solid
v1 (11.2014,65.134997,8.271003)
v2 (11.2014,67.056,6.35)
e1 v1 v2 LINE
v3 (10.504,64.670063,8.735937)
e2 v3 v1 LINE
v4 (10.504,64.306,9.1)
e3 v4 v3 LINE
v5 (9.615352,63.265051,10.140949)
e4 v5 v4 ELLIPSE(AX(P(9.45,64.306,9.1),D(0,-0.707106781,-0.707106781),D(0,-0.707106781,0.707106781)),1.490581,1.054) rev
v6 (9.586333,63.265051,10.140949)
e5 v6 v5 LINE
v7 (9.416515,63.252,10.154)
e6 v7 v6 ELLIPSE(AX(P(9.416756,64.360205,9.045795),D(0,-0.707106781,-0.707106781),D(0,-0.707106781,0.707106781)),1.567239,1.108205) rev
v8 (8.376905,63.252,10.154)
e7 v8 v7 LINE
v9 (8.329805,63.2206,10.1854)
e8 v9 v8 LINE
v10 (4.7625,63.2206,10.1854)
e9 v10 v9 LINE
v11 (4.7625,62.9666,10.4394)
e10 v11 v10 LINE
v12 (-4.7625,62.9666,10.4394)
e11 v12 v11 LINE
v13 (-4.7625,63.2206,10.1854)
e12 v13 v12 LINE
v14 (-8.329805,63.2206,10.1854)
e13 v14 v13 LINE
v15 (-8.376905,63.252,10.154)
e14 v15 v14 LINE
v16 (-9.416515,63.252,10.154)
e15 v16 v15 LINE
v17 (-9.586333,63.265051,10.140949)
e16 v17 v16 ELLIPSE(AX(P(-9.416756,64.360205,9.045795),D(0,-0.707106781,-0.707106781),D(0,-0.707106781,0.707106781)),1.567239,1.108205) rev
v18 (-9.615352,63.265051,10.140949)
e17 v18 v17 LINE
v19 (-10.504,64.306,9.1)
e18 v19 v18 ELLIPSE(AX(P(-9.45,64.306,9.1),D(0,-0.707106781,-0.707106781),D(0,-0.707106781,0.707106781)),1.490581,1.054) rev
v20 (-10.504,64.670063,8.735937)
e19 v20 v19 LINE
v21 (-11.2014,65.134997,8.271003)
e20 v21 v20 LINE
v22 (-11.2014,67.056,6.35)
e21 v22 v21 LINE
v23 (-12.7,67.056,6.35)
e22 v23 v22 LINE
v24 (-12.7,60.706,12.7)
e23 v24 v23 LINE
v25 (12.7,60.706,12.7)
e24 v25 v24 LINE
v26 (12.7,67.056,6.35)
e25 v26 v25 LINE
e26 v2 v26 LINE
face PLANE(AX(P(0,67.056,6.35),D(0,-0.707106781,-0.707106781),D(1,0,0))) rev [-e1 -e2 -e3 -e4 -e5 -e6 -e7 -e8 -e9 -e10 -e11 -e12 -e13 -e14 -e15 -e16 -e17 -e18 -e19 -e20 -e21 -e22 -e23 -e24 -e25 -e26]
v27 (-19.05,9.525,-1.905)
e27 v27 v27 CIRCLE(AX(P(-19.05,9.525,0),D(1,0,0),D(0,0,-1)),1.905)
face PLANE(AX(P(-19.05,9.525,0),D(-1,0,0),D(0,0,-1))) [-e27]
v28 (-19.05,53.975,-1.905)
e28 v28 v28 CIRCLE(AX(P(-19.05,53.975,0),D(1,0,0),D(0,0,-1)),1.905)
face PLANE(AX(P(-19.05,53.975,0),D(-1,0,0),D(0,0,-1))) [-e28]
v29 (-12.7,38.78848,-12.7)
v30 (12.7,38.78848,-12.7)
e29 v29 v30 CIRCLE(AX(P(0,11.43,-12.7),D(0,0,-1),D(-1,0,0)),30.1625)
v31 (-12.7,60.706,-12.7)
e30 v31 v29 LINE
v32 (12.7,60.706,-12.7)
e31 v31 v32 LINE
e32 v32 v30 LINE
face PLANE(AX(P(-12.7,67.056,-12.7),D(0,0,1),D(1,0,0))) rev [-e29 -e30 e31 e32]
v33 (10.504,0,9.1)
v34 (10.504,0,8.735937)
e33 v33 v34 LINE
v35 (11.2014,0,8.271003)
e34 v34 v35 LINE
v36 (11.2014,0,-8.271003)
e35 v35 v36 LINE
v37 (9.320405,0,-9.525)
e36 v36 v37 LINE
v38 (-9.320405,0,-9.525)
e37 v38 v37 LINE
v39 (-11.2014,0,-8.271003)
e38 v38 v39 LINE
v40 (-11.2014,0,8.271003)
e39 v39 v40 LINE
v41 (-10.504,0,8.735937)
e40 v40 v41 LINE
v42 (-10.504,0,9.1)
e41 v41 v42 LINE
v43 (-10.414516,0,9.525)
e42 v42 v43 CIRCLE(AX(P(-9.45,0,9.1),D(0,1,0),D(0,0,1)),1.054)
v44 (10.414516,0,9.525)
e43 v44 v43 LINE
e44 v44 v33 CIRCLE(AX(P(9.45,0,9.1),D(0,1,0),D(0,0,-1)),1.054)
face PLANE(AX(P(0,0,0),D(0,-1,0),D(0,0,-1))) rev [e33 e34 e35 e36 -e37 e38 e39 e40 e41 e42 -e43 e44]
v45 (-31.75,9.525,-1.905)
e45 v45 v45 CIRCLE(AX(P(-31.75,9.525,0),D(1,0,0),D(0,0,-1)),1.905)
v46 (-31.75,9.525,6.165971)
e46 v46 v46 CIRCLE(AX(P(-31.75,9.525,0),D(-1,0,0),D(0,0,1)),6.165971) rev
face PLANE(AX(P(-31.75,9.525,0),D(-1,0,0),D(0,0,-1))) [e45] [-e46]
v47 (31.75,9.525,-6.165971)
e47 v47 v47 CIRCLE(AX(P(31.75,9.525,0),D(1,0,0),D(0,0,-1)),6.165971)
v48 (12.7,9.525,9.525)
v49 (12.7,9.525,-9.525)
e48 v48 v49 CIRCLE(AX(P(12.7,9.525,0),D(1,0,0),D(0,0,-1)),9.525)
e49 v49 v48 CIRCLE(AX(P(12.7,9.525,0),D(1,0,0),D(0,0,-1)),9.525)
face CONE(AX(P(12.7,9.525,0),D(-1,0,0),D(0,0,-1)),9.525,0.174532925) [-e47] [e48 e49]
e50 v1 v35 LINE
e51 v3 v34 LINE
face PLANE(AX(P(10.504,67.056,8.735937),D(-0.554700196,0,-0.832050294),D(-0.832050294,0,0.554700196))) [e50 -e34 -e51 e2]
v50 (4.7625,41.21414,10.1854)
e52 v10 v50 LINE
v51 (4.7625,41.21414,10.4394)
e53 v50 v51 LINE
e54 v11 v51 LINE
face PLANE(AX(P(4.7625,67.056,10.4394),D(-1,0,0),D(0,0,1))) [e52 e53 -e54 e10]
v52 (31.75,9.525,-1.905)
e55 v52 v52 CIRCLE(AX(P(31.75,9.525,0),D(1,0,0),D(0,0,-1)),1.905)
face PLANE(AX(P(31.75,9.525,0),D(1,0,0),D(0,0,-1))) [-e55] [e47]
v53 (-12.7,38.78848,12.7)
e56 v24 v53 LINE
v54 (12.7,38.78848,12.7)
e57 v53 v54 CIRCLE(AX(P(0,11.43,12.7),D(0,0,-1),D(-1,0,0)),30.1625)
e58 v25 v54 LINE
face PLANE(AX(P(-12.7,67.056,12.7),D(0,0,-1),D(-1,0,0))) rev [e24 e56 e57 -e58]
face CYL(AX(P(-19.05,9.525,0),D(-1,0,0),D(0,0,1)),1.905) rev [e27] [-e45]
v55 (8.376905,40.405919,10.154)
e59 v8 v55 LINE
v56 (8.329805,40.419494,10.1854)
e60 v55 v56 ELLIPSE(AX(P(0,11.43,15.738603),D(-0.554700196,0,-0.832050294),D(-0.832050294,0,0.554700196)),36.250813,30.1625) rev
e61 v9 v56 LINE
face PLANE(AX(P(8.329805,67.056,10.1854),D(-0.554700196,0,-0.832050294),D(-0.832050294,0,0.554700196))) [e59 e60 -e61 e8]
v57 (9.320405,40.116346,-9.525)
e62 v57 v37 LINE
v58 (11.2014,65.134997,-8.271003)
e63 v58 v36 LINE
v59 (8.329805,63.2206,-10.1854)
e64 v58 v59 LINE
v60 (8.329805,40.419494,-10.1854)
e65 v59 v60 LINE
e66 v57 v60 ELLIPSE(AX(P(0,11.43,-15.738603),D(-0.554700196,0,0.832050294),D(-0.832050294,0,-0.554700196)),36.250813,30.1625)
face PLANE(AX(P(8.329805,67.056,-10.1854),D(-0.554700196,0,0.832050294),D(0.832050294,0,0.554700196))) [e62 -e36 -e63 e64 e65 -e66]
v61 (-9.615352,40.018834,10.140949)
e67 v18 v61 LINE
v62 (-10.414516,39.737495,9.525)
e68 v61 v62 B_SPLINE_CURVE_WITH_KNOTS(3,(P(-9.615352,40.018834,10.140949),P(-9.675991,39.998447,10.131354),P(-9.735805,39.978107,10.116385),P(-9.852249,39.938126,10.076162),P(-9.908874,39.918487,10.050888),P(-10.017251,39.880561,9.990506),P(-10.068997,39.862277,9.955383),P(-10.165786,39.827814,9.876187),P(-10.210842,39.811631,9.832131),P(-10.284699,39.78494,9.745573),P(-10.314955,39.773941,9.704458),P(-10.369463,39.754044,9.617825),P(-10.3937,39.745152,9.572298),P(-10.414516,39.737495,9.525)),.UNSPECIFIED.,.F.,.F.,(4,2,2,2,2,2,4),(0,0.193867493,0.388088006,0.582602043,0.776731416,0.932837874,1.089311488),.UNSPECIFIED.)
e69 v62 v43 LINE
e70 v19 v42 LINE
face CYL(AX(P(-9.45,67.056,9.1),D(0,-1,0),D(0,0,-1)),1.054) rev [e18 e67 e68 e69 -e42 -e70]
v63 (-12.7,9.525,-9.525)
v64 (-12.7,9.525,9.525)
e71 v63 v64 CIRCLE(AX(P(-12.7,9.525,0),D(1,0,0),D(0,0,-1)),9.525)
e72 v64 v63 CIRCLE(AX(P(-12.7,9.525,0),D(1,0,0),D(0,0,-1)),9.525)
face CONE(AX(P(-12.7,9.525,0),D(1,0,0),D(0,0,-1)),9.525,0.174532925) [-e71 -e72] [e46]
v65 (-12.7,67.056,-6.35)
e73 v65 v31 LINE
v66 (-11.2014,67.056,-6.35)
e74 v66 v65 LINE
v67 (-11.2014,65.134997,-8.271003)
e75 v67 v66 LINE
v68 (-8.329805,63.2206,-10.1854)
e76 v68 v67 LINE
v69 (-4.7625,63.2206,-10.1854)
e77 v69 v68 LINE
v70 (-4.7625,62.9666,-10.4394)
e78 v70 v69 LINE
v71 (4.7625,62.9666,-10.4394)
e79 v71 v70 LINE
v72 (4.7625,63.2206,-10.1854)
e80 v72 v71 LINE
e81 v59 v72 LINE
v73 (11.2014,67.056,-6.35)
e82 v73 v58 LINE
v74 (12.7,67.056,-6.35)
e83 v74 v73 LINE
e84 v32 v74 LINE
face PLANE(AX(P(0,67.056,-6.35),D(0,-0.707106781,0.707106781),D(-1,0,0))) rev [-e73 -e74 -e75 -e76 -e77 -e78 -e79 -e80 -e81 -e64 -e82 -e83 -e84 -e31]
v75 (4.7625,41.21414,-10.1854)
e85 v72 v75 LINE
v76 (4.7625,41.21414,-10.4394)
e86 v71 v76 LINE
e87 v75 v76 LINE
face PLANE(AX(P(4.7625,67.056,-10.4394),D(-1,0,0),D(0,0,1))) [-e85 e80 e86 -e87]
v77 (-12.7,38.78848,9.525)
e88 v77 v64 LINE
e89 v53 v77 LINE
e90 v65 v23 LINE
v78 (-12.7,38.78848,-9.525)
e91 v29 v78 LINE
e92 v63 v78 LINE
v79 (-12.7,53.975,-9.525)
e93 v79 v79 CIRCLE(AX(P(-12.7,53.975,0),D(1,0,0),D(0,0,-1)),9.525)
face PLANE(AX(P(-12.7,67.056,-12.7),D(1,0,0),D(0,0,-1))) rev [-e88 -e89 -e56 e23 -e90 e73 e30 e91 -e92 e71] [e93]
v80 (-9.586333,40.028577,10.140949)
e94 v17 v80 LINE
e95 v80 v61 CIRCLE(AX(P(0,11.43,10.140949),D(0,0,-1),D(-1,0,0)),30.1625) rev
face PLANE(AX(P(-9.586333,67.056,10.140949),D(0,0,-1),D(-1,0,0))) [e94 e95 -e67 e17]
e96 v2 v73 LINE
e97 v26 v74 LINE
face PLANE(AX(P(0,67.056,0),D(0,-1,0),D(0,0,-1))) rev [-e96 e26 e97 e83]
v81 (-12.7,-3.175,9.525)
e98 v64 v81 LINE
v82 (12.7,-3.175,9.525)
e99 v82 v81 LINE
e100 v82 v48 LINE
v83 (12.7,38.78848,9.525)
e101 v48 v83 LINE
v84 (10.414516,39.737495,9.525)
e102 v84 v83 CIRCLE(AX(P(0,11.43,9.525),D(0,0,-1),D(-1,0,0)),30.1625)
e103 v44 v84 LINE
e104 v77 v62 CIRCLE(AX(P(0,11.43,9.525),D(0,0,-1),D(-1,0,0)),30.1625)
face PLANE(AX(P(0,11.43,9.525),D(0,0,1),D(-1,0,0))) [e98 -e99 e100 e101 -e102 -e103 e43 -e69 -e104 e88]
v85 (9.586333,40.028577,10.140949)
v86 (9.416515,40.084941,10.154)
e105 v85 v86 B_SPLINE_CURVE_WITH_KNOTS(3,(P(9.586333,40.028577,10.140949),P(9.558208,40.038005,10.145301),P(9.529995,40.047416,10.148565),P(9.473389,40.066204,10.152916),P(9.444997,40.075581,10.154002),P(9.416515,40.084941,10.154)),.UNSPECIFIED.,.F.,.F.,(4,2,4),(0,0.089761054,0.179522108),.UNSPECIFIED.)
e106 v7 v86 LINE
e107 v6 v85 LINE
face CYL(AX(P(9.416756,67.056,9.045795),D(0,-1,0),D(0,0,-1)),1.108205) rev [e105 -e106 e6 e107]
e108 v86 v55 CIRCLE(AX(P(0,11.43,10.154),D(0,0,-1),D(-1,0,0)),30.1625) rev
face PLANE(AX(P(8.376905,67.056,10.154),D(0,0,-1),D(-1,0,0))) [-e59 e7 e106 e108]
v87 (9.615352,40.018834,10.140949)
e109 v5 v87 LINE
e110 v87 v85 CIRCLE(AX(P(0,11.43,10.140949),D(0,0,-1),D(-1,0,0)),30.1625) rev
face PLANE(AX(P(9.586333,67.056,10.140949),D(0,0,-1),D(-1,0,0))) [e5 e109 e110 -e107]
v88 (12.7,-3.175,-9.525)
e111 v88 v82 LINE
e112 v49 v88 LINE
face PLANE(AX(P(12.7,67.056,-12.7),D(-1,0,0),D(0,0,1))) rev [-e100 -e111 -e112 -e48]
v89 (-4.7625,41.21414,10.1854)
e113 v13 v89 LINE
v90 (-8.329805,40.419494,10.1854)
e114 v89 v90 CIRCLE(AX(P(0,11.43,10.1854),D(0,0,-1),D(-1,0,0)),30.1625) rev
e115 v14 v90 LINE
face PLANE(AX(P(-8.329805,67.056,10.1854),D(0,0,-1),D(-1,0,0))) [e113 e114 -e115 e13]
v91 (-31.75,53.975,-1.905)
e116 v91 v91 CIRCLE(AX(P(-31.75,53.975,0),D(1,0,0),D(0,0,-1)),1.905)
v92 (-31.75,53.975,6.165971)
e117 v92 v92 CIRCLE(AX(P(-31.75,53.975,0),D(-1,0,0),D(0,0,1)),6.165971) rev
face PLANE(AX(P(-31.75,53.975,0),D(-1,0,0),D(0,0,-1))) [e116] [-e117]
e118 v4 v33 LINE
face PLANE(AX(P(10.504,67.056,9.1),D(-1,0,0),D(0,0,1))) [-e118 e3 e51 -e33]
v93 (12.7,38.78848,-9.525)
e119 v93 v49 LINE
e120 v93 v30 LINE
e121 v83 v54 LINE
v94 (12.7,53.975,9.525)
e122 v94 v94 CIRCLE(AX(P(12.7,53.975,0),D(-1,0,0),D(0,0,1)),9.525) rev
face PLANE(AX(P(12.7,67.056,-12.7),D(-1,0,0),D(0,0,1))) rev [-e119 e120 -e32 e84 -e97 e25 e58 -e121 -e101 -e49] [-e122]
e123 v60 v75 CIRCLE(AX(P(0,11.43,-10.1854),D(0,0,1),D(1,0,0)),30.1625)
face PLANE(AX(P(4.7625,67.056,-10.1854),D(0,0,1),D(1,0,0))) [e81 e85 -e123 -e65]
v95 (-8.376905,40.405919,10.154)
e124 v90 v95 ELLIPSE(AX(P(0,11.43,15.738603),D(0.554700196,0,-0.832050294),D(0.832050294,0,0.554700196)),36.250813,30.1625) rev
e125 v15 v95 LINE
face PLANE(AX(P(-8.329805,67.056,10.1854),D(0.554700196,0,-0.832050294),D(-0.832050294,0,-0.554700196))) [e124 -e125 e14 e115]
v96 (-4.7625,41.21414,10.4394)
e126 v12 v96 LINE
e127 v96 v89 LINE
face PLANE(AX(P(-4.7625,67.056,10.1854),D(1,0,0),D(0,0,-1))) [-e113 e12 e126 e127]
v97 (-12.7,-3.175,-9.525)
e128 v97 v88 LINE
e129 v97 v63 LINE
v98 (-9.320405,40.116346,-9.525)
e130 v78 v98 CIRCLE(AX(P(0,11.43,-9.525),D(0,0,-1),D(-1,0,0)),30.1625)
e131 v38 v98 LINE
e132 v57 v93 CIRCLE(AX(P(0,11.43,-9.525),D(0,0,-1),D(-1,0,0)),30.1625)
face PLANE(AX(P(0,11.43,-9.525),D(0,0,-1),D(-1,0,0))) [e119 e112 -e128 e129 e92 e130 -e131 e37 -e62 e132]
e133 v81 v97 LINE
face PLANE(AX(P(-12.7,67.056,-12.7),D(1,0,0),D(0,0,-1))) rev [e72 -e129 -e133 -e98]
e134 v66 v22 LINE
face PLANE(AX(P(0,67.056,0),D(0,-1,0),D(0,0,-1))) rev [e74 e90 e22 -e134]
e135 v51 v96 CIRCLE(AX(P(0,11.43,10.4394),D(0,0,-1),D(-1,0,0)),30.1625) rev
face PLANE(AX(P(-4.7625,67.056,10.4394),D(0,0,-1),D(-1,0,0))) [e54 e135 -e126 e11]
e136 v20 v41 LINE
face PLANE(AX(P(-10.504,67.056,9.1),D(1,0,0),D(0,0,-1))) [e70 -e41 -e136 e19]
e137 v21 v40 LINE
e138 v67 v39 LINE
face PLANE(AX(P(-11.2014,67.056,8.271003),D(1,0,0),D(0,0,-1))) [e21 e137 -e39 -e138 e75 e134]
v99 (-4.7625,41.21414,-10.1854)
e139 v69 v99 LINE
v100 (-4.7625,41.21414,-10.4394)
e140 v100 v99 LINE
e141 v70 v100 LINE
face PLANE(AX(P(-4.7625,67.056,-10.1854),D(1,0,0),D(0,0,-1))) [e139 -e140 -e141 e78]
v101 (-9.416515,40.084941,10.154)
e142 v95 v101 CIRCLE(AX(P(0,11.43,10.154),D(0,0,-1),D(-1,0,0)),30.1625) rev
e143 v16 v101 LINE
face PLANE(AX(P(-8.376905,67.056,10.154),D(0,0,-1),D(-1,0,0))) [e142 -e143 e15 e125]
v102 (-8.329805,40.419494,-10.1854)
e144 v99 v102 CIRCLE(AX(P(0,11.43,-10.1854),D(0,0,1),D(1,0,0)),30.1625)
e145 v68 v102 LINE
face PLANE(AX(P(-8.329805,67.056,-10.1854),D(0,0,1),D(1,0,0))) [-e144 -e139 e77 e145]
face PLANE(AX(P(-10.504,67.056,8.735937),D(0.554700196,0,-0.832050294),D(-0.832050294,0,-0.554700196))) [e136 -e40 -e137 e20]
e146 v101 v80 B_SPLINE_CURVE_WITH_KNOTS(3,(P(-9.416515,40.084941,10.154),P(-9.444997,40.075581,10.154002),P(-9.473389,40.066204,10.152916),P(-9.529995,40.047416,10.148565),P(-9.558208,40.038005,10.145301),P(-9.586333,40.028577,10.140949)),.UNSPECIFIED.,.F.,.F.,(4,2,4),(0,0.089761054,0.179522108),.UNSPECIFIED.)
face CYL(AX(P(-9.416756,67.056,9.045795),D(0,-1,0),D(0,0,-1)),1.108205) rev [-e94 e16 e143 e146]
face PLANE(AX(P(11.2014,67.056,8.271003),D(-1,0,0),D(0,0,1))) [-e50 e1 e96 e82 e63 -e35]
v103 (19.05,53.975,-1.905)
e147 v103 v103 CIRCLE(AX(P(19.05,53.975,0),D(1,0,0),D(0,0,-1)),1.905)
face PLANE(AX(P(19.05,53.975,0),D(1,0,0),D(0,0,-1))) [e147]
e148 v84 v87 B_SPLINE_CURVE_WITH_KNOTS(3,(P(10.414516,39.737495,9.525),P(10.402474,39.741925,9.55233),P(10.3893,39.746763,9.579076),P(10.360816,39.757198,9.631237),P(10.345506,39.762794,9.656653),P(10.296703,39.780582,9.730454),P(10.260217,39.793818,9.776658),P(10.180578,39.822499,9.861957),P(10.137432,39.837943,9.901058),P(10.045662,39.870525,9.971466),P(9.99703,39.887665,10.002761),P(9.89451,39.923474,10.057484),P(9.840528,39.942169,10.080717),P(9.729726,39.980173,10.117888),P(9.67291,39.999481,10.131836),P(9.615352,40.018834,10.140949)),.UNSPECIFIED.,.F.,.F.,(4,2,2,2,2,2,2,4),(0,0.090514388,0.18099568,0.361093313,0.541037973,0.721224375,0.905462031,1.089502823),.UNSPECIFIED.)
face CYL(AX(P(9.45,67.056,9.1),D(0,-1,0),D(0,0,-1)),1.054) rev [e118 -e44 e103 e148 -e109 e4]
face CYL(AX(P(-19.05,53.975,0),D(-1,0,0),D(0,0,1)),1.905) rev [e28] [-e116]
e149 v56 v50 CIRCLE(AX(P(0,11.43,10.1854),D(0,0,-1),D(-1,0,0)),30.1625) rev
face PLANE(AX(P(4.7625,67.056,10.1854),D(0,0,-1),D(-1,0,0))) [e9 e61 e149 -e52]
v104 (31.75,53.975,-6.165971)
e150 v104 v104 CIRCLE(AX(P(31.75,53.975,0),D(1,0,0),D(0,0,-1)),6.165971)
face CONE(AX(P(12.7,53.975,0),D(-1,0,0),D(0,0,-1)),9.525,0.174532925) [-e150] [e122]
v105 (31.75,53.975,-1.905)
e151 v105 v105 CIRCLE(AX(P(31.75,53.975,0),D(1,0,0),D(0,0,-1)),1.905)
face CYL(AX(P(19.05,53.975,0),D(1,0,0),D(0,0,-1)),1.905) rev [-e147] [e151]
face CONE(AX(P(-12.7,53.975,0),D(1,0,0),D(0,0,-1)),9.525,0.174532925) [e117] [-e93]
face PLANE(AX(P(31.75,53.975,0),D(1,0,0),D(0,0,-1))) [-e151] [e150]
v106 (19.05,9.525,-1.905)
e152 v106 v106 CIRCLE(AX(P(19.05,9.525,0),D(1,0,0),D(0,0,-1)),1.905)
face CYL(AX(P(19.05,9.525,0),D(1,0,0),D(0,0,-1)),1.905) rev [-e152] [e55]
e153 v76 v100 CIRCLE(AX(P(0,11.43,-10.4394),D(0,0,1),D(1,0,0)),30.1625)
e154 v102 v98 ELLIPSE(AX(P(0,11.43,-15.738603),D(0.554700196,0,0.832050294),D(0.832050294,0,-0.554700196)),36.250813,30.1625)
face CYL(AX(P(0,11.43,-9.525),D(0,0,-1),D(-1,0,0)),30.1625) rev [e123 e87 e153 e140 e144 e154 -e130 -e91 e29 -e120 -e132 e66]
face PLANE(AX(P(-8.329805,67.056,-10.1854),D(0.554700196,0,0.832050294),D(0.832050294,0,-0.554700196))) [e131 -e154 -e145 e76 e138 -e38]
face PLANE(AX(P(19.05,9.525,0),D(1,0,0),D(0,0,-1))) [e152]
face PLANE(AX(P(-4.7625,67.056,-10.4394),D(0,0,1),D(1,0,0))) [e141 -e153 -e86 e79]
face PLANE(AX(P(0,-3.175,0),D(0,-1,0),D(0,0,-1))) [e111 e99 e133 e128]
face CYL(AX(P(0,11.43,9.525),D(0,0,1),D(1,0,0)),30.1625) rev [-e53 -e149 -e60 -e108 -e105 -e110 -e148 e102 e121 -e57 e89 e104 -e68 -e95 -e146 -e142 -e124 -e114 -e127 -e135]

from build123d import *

# Parameters (mm, degrees)
SKETCH1_W               = 25.4
SKETCH1_H               = 25.4
BOSS_EXTRUDE1_DEPTH     = 67.056
SKETCH4_W               = 25.4
SKETCH4_H               = 25.4
BOSS_EXTRUDE4_DEPTH     = 3.175
SKETCH5_R               = 30.1625
CUT_EXTRUDE1_DEPTH      = 3.175
SKETCH7_R               = 9.525
BOSS_EXTRUDE6_DEPTH     = 19.05
BOSS_EXTRUDE6_TAPER     = 10
SKETCH8_R               = 1.905
CUT_EXTRUDE2_DEPTH      = 12.7
LPATTERN1_COUNT         = 2
LPATTERN1_PITCH         = 44.45
MIRROR2_COPY_1_SKETCH_R = 9.525
MIRROR2_COPY_1_DEPTH    = 19.05
MIRROR2_COPY_1_TAPER    = 10
MIRROR2_COPY_2_SKETCH_R = 1.905
MIRROR2_COPY_2_DEPTH    = 12.7
CHAMFER1_SIZE           = 6.35


with BuildPart() as part:
    # Sketch1 → Boss-Extrude1 (new body)
    with BuildSketch(Plane(origin=(0, 0, 0), x_dir=(1, 0, 0), z_dir=(0, 1, 0))):
        Rectangle(SKETCH1_W, SKETCH1_H)
        with BuildLine():
            Line((4.7625, -10.1854), (8.329805012, -10.1854))
            Line((8.329805012, -10.1854), (8.376905012, -10.154))
            Line((8.376905012, -10.154), (9.416515139, -10.154))
            ThreePointArc((9.416515139, -10.154), (9.501675056, -10.1507417), (9.586332782, -10.140948982))
            Line((9.586332782, -10.140948982), (9.615351798, -10.140948982))
            ThreePointArc((9.615351798, -10.140948982), (10.251622353, -9.784337345), (10.504, -9.1))
            Line((10.504, -9.1), (10.504, -8.735936675))
            Line((10.504, -8.735936675), (11.2014, -8.271003341))
            Line((11.2014, -8.271003341), (11.2014, 8.271003341))
            Line((11.2014, 8.271003341), (8.329805012, 10.1854))
            Line((8.329805012, 10.1854), (4.7625, 10.1854))
            Line((4.7625, 10.1854), (4.7625, 10.4394))
            Line((4.7625, 10.4394), (-4.7625, 10.4394))
            Line((-4.7625, 10.4394), (-4.7625, 10.1854))
            Line((-4.7625, 10.1854), (-8.329805012, 10.1854))
            Line((-8.329805012, 10.1854), (-11.2014, 8.271003341))
            Line((-11.2014, 8.271003341), (-11.2014, -8.271003341))
            Line((-11.2014, -8.271003341), (-10.504, -8.735936675))
            Line((-10.504, -8.735936675), (-10.504, -9.1))
            ThreePointArc((-10.504, -9.1), (-10.251622353, -9.784337345), (-9.615351798, -10.140948982))
            Line((-9.615351798, -10.140948982), (-9.586332782, -10.140948982))
            ThreePointArc((-9.586332782, -10.140948982), (-9.501675056, -10.1507417), (-9.416515139, -10.154))
            Line((-9.416515139, -10.154), (-8.376905012, -10.154))
            Line((-8.376905012, -10.154), (-8.329805012, -10.1854))
            Line((-8.329805012, -10.1854), (-4.7625, -10.1854))
            Line((-4.7625, -10.1854), (-4.7625, -10.4394))
            Line((-4.7625, -10.4394), (4.7625, -10.4394))
            Line((4.7625, -10.4394), (4.7625, -10.1854))
        make_face(mode=Mode.SUBTRACT)
    extrude(amount=BOSS_EXTRUDE1_DEPTH)

    # Sketch4 → Boss-Extrude4 (add)
    with BuildSketch(Plane(origin=(0, 0, 0), x_dir=(-1, 0, 0), z_dir=(0, -1, 0))):
        Rectangle(SKETCH4_W, SKETCH4_H)
    extrude(amount=BOSS_EXTRUDE4_DEPTH)

    # Sketch5 → Cut-Extrude1 (cut)
    with BuildSketch(Plane(origin=(0, 0, -12.7), x_dir=(-1, 0, 0), z_dir=(0, 0, -1))):
        with Locations((0, 11.43)):
            Circle(SKETCH5_R)
    cut_extrude1 = extrude(amount=-CUT_EXTRUDE1_DEPTH, mode=Mode.SUBTRACT)

    # Mirror1: Cut-Extrude1 across plane
    add(cut_extrude1.mirror(Plane.XY), mode=Mode.SUBTRACT)

    # Sketch7 → Boss-Extrude6 (add)
    with BuildSketch(Plane(origin=(12.7, 0, 0), x_dir=(0, 0, -1), z_dir=(1, 0, 0))):
        with Locations((0, 9.525)):
            Circle(SKETCH7_R)
    boss_extrude6 = extrude(amount=BOSS_EXTRUDE6_DEPTH, taper=BOSS_EXTRUDE6_TAPER)

    # Sketch8 → Cut-Extrude2 (cut)
    with BuildSketch(Plane(origin=(31.75, 0, 0), x_dir=(0, 0, -1), z_dir=(1, 0, 0))):
        with Locations((0, 9.525)):
            Circle(SKETCH8_R)
    cut_extrude2 = extrude(amount=-CUT_EXTRUDE2_DEPTH, mode=Mode.SUBTRACT)

    # LPattern1: Boss-Extrude6, Cut-Extrude2 ×2
    with Locations(*[(0, i * LPATTERN1_PITCH, 0) for i in range(1, LPATTERN1_COUNT)]):
        add(boss_extrude6)
        add(cut_extrude2, mode=Mode.SUBTRACT)

    # Mirror2: Boss-Extrude6, Cut-Extrude2 across plane
    add(boss_extrude6.mirror(Plane(origin=(0, 0, 0), x_dir=(0, 0, 1), z_dir=(1, 0, 0))))
    add(cut_extrude2.mirror(Plane(origin=(0, 0, 0), x_dir=(0, 0, 1), z_dir=(1, 0, 0))), mode=Mode.SUBTRACT)

    # Mirror2 copy 1 sketch → Mirror2 copy 1 (add)
    with BuildSketch(Plane(origin=(-12.7, 44.45, 0), x_dir=(0, 0, -1), z_dir=(-1, 0, 0))):
        with Locations((0, -9.525)):
            Circle(MIRROR2_COPY_1_SKETCH_R)
    extrude(amount=MIRROR2_COPY_1_DEPTH, taper=MIRROR2_COPY_1_TAPER)

    # Mirror2 copy 2 sketch → Mirror2 copy 2 (cut)
    with BuildSketch(Plane(origin=(-31.75, 44.45, 0), x_dir=(0, 0, -1), z_dir=(-1, 0, 0))):
        with Locations((0, -9.525)):
            Circle(MIRROR2_COPY_2_SKETCH_R)
    extrude(amount=-MIRROR2_COPY_2_DEPTH, mode=Mode.SUBTRACT)

    # Chamfer1
    # the kernel refuses this chamfer: 6.35 mm, written as the material it takes off along each edge
    with BuildSketch(Plane(origin=(-29.030186974, 67.056, 12.7), x_dir=(0, -0.9996219169112968, 0.027495876610586455), z_dir=(1, 0, 0))) as chamfer1_piece_1:
        Polygon((CHAMFER1_SIZE * 0.999621916911, CHAMFER1_SIZE * 0.0274958766106), (-CHAMFER1_SIZE * 0.0274958766106, CHAMFER1_SIZE * 0.999621916911), (0, 0), align=None)
    extrude(amount=58.060373947, mode=Mode.SUBTRACT)
    with BuildSketch(Plane(origin=(29.030186974, 67.056, -12.7), x_dir=(0, 0.027495876610585654, 0.9996219169112966), z_dir=(-1, 0, 0))) as chamfer1_piece_2:
        Polygon((CHAMFER1_SIZE * 0.999621916911, -CHAMFER1_SIZE * 0.0274958766106), (-CHAMFER1_SIZE * 0.0274958766106, -CHAMFER1_SIZE * 0.999621916911), (0, 0), align=None)
    extrude(amount=58.060373947, mode=Mode.SUBTRACT)


solid = part.part
